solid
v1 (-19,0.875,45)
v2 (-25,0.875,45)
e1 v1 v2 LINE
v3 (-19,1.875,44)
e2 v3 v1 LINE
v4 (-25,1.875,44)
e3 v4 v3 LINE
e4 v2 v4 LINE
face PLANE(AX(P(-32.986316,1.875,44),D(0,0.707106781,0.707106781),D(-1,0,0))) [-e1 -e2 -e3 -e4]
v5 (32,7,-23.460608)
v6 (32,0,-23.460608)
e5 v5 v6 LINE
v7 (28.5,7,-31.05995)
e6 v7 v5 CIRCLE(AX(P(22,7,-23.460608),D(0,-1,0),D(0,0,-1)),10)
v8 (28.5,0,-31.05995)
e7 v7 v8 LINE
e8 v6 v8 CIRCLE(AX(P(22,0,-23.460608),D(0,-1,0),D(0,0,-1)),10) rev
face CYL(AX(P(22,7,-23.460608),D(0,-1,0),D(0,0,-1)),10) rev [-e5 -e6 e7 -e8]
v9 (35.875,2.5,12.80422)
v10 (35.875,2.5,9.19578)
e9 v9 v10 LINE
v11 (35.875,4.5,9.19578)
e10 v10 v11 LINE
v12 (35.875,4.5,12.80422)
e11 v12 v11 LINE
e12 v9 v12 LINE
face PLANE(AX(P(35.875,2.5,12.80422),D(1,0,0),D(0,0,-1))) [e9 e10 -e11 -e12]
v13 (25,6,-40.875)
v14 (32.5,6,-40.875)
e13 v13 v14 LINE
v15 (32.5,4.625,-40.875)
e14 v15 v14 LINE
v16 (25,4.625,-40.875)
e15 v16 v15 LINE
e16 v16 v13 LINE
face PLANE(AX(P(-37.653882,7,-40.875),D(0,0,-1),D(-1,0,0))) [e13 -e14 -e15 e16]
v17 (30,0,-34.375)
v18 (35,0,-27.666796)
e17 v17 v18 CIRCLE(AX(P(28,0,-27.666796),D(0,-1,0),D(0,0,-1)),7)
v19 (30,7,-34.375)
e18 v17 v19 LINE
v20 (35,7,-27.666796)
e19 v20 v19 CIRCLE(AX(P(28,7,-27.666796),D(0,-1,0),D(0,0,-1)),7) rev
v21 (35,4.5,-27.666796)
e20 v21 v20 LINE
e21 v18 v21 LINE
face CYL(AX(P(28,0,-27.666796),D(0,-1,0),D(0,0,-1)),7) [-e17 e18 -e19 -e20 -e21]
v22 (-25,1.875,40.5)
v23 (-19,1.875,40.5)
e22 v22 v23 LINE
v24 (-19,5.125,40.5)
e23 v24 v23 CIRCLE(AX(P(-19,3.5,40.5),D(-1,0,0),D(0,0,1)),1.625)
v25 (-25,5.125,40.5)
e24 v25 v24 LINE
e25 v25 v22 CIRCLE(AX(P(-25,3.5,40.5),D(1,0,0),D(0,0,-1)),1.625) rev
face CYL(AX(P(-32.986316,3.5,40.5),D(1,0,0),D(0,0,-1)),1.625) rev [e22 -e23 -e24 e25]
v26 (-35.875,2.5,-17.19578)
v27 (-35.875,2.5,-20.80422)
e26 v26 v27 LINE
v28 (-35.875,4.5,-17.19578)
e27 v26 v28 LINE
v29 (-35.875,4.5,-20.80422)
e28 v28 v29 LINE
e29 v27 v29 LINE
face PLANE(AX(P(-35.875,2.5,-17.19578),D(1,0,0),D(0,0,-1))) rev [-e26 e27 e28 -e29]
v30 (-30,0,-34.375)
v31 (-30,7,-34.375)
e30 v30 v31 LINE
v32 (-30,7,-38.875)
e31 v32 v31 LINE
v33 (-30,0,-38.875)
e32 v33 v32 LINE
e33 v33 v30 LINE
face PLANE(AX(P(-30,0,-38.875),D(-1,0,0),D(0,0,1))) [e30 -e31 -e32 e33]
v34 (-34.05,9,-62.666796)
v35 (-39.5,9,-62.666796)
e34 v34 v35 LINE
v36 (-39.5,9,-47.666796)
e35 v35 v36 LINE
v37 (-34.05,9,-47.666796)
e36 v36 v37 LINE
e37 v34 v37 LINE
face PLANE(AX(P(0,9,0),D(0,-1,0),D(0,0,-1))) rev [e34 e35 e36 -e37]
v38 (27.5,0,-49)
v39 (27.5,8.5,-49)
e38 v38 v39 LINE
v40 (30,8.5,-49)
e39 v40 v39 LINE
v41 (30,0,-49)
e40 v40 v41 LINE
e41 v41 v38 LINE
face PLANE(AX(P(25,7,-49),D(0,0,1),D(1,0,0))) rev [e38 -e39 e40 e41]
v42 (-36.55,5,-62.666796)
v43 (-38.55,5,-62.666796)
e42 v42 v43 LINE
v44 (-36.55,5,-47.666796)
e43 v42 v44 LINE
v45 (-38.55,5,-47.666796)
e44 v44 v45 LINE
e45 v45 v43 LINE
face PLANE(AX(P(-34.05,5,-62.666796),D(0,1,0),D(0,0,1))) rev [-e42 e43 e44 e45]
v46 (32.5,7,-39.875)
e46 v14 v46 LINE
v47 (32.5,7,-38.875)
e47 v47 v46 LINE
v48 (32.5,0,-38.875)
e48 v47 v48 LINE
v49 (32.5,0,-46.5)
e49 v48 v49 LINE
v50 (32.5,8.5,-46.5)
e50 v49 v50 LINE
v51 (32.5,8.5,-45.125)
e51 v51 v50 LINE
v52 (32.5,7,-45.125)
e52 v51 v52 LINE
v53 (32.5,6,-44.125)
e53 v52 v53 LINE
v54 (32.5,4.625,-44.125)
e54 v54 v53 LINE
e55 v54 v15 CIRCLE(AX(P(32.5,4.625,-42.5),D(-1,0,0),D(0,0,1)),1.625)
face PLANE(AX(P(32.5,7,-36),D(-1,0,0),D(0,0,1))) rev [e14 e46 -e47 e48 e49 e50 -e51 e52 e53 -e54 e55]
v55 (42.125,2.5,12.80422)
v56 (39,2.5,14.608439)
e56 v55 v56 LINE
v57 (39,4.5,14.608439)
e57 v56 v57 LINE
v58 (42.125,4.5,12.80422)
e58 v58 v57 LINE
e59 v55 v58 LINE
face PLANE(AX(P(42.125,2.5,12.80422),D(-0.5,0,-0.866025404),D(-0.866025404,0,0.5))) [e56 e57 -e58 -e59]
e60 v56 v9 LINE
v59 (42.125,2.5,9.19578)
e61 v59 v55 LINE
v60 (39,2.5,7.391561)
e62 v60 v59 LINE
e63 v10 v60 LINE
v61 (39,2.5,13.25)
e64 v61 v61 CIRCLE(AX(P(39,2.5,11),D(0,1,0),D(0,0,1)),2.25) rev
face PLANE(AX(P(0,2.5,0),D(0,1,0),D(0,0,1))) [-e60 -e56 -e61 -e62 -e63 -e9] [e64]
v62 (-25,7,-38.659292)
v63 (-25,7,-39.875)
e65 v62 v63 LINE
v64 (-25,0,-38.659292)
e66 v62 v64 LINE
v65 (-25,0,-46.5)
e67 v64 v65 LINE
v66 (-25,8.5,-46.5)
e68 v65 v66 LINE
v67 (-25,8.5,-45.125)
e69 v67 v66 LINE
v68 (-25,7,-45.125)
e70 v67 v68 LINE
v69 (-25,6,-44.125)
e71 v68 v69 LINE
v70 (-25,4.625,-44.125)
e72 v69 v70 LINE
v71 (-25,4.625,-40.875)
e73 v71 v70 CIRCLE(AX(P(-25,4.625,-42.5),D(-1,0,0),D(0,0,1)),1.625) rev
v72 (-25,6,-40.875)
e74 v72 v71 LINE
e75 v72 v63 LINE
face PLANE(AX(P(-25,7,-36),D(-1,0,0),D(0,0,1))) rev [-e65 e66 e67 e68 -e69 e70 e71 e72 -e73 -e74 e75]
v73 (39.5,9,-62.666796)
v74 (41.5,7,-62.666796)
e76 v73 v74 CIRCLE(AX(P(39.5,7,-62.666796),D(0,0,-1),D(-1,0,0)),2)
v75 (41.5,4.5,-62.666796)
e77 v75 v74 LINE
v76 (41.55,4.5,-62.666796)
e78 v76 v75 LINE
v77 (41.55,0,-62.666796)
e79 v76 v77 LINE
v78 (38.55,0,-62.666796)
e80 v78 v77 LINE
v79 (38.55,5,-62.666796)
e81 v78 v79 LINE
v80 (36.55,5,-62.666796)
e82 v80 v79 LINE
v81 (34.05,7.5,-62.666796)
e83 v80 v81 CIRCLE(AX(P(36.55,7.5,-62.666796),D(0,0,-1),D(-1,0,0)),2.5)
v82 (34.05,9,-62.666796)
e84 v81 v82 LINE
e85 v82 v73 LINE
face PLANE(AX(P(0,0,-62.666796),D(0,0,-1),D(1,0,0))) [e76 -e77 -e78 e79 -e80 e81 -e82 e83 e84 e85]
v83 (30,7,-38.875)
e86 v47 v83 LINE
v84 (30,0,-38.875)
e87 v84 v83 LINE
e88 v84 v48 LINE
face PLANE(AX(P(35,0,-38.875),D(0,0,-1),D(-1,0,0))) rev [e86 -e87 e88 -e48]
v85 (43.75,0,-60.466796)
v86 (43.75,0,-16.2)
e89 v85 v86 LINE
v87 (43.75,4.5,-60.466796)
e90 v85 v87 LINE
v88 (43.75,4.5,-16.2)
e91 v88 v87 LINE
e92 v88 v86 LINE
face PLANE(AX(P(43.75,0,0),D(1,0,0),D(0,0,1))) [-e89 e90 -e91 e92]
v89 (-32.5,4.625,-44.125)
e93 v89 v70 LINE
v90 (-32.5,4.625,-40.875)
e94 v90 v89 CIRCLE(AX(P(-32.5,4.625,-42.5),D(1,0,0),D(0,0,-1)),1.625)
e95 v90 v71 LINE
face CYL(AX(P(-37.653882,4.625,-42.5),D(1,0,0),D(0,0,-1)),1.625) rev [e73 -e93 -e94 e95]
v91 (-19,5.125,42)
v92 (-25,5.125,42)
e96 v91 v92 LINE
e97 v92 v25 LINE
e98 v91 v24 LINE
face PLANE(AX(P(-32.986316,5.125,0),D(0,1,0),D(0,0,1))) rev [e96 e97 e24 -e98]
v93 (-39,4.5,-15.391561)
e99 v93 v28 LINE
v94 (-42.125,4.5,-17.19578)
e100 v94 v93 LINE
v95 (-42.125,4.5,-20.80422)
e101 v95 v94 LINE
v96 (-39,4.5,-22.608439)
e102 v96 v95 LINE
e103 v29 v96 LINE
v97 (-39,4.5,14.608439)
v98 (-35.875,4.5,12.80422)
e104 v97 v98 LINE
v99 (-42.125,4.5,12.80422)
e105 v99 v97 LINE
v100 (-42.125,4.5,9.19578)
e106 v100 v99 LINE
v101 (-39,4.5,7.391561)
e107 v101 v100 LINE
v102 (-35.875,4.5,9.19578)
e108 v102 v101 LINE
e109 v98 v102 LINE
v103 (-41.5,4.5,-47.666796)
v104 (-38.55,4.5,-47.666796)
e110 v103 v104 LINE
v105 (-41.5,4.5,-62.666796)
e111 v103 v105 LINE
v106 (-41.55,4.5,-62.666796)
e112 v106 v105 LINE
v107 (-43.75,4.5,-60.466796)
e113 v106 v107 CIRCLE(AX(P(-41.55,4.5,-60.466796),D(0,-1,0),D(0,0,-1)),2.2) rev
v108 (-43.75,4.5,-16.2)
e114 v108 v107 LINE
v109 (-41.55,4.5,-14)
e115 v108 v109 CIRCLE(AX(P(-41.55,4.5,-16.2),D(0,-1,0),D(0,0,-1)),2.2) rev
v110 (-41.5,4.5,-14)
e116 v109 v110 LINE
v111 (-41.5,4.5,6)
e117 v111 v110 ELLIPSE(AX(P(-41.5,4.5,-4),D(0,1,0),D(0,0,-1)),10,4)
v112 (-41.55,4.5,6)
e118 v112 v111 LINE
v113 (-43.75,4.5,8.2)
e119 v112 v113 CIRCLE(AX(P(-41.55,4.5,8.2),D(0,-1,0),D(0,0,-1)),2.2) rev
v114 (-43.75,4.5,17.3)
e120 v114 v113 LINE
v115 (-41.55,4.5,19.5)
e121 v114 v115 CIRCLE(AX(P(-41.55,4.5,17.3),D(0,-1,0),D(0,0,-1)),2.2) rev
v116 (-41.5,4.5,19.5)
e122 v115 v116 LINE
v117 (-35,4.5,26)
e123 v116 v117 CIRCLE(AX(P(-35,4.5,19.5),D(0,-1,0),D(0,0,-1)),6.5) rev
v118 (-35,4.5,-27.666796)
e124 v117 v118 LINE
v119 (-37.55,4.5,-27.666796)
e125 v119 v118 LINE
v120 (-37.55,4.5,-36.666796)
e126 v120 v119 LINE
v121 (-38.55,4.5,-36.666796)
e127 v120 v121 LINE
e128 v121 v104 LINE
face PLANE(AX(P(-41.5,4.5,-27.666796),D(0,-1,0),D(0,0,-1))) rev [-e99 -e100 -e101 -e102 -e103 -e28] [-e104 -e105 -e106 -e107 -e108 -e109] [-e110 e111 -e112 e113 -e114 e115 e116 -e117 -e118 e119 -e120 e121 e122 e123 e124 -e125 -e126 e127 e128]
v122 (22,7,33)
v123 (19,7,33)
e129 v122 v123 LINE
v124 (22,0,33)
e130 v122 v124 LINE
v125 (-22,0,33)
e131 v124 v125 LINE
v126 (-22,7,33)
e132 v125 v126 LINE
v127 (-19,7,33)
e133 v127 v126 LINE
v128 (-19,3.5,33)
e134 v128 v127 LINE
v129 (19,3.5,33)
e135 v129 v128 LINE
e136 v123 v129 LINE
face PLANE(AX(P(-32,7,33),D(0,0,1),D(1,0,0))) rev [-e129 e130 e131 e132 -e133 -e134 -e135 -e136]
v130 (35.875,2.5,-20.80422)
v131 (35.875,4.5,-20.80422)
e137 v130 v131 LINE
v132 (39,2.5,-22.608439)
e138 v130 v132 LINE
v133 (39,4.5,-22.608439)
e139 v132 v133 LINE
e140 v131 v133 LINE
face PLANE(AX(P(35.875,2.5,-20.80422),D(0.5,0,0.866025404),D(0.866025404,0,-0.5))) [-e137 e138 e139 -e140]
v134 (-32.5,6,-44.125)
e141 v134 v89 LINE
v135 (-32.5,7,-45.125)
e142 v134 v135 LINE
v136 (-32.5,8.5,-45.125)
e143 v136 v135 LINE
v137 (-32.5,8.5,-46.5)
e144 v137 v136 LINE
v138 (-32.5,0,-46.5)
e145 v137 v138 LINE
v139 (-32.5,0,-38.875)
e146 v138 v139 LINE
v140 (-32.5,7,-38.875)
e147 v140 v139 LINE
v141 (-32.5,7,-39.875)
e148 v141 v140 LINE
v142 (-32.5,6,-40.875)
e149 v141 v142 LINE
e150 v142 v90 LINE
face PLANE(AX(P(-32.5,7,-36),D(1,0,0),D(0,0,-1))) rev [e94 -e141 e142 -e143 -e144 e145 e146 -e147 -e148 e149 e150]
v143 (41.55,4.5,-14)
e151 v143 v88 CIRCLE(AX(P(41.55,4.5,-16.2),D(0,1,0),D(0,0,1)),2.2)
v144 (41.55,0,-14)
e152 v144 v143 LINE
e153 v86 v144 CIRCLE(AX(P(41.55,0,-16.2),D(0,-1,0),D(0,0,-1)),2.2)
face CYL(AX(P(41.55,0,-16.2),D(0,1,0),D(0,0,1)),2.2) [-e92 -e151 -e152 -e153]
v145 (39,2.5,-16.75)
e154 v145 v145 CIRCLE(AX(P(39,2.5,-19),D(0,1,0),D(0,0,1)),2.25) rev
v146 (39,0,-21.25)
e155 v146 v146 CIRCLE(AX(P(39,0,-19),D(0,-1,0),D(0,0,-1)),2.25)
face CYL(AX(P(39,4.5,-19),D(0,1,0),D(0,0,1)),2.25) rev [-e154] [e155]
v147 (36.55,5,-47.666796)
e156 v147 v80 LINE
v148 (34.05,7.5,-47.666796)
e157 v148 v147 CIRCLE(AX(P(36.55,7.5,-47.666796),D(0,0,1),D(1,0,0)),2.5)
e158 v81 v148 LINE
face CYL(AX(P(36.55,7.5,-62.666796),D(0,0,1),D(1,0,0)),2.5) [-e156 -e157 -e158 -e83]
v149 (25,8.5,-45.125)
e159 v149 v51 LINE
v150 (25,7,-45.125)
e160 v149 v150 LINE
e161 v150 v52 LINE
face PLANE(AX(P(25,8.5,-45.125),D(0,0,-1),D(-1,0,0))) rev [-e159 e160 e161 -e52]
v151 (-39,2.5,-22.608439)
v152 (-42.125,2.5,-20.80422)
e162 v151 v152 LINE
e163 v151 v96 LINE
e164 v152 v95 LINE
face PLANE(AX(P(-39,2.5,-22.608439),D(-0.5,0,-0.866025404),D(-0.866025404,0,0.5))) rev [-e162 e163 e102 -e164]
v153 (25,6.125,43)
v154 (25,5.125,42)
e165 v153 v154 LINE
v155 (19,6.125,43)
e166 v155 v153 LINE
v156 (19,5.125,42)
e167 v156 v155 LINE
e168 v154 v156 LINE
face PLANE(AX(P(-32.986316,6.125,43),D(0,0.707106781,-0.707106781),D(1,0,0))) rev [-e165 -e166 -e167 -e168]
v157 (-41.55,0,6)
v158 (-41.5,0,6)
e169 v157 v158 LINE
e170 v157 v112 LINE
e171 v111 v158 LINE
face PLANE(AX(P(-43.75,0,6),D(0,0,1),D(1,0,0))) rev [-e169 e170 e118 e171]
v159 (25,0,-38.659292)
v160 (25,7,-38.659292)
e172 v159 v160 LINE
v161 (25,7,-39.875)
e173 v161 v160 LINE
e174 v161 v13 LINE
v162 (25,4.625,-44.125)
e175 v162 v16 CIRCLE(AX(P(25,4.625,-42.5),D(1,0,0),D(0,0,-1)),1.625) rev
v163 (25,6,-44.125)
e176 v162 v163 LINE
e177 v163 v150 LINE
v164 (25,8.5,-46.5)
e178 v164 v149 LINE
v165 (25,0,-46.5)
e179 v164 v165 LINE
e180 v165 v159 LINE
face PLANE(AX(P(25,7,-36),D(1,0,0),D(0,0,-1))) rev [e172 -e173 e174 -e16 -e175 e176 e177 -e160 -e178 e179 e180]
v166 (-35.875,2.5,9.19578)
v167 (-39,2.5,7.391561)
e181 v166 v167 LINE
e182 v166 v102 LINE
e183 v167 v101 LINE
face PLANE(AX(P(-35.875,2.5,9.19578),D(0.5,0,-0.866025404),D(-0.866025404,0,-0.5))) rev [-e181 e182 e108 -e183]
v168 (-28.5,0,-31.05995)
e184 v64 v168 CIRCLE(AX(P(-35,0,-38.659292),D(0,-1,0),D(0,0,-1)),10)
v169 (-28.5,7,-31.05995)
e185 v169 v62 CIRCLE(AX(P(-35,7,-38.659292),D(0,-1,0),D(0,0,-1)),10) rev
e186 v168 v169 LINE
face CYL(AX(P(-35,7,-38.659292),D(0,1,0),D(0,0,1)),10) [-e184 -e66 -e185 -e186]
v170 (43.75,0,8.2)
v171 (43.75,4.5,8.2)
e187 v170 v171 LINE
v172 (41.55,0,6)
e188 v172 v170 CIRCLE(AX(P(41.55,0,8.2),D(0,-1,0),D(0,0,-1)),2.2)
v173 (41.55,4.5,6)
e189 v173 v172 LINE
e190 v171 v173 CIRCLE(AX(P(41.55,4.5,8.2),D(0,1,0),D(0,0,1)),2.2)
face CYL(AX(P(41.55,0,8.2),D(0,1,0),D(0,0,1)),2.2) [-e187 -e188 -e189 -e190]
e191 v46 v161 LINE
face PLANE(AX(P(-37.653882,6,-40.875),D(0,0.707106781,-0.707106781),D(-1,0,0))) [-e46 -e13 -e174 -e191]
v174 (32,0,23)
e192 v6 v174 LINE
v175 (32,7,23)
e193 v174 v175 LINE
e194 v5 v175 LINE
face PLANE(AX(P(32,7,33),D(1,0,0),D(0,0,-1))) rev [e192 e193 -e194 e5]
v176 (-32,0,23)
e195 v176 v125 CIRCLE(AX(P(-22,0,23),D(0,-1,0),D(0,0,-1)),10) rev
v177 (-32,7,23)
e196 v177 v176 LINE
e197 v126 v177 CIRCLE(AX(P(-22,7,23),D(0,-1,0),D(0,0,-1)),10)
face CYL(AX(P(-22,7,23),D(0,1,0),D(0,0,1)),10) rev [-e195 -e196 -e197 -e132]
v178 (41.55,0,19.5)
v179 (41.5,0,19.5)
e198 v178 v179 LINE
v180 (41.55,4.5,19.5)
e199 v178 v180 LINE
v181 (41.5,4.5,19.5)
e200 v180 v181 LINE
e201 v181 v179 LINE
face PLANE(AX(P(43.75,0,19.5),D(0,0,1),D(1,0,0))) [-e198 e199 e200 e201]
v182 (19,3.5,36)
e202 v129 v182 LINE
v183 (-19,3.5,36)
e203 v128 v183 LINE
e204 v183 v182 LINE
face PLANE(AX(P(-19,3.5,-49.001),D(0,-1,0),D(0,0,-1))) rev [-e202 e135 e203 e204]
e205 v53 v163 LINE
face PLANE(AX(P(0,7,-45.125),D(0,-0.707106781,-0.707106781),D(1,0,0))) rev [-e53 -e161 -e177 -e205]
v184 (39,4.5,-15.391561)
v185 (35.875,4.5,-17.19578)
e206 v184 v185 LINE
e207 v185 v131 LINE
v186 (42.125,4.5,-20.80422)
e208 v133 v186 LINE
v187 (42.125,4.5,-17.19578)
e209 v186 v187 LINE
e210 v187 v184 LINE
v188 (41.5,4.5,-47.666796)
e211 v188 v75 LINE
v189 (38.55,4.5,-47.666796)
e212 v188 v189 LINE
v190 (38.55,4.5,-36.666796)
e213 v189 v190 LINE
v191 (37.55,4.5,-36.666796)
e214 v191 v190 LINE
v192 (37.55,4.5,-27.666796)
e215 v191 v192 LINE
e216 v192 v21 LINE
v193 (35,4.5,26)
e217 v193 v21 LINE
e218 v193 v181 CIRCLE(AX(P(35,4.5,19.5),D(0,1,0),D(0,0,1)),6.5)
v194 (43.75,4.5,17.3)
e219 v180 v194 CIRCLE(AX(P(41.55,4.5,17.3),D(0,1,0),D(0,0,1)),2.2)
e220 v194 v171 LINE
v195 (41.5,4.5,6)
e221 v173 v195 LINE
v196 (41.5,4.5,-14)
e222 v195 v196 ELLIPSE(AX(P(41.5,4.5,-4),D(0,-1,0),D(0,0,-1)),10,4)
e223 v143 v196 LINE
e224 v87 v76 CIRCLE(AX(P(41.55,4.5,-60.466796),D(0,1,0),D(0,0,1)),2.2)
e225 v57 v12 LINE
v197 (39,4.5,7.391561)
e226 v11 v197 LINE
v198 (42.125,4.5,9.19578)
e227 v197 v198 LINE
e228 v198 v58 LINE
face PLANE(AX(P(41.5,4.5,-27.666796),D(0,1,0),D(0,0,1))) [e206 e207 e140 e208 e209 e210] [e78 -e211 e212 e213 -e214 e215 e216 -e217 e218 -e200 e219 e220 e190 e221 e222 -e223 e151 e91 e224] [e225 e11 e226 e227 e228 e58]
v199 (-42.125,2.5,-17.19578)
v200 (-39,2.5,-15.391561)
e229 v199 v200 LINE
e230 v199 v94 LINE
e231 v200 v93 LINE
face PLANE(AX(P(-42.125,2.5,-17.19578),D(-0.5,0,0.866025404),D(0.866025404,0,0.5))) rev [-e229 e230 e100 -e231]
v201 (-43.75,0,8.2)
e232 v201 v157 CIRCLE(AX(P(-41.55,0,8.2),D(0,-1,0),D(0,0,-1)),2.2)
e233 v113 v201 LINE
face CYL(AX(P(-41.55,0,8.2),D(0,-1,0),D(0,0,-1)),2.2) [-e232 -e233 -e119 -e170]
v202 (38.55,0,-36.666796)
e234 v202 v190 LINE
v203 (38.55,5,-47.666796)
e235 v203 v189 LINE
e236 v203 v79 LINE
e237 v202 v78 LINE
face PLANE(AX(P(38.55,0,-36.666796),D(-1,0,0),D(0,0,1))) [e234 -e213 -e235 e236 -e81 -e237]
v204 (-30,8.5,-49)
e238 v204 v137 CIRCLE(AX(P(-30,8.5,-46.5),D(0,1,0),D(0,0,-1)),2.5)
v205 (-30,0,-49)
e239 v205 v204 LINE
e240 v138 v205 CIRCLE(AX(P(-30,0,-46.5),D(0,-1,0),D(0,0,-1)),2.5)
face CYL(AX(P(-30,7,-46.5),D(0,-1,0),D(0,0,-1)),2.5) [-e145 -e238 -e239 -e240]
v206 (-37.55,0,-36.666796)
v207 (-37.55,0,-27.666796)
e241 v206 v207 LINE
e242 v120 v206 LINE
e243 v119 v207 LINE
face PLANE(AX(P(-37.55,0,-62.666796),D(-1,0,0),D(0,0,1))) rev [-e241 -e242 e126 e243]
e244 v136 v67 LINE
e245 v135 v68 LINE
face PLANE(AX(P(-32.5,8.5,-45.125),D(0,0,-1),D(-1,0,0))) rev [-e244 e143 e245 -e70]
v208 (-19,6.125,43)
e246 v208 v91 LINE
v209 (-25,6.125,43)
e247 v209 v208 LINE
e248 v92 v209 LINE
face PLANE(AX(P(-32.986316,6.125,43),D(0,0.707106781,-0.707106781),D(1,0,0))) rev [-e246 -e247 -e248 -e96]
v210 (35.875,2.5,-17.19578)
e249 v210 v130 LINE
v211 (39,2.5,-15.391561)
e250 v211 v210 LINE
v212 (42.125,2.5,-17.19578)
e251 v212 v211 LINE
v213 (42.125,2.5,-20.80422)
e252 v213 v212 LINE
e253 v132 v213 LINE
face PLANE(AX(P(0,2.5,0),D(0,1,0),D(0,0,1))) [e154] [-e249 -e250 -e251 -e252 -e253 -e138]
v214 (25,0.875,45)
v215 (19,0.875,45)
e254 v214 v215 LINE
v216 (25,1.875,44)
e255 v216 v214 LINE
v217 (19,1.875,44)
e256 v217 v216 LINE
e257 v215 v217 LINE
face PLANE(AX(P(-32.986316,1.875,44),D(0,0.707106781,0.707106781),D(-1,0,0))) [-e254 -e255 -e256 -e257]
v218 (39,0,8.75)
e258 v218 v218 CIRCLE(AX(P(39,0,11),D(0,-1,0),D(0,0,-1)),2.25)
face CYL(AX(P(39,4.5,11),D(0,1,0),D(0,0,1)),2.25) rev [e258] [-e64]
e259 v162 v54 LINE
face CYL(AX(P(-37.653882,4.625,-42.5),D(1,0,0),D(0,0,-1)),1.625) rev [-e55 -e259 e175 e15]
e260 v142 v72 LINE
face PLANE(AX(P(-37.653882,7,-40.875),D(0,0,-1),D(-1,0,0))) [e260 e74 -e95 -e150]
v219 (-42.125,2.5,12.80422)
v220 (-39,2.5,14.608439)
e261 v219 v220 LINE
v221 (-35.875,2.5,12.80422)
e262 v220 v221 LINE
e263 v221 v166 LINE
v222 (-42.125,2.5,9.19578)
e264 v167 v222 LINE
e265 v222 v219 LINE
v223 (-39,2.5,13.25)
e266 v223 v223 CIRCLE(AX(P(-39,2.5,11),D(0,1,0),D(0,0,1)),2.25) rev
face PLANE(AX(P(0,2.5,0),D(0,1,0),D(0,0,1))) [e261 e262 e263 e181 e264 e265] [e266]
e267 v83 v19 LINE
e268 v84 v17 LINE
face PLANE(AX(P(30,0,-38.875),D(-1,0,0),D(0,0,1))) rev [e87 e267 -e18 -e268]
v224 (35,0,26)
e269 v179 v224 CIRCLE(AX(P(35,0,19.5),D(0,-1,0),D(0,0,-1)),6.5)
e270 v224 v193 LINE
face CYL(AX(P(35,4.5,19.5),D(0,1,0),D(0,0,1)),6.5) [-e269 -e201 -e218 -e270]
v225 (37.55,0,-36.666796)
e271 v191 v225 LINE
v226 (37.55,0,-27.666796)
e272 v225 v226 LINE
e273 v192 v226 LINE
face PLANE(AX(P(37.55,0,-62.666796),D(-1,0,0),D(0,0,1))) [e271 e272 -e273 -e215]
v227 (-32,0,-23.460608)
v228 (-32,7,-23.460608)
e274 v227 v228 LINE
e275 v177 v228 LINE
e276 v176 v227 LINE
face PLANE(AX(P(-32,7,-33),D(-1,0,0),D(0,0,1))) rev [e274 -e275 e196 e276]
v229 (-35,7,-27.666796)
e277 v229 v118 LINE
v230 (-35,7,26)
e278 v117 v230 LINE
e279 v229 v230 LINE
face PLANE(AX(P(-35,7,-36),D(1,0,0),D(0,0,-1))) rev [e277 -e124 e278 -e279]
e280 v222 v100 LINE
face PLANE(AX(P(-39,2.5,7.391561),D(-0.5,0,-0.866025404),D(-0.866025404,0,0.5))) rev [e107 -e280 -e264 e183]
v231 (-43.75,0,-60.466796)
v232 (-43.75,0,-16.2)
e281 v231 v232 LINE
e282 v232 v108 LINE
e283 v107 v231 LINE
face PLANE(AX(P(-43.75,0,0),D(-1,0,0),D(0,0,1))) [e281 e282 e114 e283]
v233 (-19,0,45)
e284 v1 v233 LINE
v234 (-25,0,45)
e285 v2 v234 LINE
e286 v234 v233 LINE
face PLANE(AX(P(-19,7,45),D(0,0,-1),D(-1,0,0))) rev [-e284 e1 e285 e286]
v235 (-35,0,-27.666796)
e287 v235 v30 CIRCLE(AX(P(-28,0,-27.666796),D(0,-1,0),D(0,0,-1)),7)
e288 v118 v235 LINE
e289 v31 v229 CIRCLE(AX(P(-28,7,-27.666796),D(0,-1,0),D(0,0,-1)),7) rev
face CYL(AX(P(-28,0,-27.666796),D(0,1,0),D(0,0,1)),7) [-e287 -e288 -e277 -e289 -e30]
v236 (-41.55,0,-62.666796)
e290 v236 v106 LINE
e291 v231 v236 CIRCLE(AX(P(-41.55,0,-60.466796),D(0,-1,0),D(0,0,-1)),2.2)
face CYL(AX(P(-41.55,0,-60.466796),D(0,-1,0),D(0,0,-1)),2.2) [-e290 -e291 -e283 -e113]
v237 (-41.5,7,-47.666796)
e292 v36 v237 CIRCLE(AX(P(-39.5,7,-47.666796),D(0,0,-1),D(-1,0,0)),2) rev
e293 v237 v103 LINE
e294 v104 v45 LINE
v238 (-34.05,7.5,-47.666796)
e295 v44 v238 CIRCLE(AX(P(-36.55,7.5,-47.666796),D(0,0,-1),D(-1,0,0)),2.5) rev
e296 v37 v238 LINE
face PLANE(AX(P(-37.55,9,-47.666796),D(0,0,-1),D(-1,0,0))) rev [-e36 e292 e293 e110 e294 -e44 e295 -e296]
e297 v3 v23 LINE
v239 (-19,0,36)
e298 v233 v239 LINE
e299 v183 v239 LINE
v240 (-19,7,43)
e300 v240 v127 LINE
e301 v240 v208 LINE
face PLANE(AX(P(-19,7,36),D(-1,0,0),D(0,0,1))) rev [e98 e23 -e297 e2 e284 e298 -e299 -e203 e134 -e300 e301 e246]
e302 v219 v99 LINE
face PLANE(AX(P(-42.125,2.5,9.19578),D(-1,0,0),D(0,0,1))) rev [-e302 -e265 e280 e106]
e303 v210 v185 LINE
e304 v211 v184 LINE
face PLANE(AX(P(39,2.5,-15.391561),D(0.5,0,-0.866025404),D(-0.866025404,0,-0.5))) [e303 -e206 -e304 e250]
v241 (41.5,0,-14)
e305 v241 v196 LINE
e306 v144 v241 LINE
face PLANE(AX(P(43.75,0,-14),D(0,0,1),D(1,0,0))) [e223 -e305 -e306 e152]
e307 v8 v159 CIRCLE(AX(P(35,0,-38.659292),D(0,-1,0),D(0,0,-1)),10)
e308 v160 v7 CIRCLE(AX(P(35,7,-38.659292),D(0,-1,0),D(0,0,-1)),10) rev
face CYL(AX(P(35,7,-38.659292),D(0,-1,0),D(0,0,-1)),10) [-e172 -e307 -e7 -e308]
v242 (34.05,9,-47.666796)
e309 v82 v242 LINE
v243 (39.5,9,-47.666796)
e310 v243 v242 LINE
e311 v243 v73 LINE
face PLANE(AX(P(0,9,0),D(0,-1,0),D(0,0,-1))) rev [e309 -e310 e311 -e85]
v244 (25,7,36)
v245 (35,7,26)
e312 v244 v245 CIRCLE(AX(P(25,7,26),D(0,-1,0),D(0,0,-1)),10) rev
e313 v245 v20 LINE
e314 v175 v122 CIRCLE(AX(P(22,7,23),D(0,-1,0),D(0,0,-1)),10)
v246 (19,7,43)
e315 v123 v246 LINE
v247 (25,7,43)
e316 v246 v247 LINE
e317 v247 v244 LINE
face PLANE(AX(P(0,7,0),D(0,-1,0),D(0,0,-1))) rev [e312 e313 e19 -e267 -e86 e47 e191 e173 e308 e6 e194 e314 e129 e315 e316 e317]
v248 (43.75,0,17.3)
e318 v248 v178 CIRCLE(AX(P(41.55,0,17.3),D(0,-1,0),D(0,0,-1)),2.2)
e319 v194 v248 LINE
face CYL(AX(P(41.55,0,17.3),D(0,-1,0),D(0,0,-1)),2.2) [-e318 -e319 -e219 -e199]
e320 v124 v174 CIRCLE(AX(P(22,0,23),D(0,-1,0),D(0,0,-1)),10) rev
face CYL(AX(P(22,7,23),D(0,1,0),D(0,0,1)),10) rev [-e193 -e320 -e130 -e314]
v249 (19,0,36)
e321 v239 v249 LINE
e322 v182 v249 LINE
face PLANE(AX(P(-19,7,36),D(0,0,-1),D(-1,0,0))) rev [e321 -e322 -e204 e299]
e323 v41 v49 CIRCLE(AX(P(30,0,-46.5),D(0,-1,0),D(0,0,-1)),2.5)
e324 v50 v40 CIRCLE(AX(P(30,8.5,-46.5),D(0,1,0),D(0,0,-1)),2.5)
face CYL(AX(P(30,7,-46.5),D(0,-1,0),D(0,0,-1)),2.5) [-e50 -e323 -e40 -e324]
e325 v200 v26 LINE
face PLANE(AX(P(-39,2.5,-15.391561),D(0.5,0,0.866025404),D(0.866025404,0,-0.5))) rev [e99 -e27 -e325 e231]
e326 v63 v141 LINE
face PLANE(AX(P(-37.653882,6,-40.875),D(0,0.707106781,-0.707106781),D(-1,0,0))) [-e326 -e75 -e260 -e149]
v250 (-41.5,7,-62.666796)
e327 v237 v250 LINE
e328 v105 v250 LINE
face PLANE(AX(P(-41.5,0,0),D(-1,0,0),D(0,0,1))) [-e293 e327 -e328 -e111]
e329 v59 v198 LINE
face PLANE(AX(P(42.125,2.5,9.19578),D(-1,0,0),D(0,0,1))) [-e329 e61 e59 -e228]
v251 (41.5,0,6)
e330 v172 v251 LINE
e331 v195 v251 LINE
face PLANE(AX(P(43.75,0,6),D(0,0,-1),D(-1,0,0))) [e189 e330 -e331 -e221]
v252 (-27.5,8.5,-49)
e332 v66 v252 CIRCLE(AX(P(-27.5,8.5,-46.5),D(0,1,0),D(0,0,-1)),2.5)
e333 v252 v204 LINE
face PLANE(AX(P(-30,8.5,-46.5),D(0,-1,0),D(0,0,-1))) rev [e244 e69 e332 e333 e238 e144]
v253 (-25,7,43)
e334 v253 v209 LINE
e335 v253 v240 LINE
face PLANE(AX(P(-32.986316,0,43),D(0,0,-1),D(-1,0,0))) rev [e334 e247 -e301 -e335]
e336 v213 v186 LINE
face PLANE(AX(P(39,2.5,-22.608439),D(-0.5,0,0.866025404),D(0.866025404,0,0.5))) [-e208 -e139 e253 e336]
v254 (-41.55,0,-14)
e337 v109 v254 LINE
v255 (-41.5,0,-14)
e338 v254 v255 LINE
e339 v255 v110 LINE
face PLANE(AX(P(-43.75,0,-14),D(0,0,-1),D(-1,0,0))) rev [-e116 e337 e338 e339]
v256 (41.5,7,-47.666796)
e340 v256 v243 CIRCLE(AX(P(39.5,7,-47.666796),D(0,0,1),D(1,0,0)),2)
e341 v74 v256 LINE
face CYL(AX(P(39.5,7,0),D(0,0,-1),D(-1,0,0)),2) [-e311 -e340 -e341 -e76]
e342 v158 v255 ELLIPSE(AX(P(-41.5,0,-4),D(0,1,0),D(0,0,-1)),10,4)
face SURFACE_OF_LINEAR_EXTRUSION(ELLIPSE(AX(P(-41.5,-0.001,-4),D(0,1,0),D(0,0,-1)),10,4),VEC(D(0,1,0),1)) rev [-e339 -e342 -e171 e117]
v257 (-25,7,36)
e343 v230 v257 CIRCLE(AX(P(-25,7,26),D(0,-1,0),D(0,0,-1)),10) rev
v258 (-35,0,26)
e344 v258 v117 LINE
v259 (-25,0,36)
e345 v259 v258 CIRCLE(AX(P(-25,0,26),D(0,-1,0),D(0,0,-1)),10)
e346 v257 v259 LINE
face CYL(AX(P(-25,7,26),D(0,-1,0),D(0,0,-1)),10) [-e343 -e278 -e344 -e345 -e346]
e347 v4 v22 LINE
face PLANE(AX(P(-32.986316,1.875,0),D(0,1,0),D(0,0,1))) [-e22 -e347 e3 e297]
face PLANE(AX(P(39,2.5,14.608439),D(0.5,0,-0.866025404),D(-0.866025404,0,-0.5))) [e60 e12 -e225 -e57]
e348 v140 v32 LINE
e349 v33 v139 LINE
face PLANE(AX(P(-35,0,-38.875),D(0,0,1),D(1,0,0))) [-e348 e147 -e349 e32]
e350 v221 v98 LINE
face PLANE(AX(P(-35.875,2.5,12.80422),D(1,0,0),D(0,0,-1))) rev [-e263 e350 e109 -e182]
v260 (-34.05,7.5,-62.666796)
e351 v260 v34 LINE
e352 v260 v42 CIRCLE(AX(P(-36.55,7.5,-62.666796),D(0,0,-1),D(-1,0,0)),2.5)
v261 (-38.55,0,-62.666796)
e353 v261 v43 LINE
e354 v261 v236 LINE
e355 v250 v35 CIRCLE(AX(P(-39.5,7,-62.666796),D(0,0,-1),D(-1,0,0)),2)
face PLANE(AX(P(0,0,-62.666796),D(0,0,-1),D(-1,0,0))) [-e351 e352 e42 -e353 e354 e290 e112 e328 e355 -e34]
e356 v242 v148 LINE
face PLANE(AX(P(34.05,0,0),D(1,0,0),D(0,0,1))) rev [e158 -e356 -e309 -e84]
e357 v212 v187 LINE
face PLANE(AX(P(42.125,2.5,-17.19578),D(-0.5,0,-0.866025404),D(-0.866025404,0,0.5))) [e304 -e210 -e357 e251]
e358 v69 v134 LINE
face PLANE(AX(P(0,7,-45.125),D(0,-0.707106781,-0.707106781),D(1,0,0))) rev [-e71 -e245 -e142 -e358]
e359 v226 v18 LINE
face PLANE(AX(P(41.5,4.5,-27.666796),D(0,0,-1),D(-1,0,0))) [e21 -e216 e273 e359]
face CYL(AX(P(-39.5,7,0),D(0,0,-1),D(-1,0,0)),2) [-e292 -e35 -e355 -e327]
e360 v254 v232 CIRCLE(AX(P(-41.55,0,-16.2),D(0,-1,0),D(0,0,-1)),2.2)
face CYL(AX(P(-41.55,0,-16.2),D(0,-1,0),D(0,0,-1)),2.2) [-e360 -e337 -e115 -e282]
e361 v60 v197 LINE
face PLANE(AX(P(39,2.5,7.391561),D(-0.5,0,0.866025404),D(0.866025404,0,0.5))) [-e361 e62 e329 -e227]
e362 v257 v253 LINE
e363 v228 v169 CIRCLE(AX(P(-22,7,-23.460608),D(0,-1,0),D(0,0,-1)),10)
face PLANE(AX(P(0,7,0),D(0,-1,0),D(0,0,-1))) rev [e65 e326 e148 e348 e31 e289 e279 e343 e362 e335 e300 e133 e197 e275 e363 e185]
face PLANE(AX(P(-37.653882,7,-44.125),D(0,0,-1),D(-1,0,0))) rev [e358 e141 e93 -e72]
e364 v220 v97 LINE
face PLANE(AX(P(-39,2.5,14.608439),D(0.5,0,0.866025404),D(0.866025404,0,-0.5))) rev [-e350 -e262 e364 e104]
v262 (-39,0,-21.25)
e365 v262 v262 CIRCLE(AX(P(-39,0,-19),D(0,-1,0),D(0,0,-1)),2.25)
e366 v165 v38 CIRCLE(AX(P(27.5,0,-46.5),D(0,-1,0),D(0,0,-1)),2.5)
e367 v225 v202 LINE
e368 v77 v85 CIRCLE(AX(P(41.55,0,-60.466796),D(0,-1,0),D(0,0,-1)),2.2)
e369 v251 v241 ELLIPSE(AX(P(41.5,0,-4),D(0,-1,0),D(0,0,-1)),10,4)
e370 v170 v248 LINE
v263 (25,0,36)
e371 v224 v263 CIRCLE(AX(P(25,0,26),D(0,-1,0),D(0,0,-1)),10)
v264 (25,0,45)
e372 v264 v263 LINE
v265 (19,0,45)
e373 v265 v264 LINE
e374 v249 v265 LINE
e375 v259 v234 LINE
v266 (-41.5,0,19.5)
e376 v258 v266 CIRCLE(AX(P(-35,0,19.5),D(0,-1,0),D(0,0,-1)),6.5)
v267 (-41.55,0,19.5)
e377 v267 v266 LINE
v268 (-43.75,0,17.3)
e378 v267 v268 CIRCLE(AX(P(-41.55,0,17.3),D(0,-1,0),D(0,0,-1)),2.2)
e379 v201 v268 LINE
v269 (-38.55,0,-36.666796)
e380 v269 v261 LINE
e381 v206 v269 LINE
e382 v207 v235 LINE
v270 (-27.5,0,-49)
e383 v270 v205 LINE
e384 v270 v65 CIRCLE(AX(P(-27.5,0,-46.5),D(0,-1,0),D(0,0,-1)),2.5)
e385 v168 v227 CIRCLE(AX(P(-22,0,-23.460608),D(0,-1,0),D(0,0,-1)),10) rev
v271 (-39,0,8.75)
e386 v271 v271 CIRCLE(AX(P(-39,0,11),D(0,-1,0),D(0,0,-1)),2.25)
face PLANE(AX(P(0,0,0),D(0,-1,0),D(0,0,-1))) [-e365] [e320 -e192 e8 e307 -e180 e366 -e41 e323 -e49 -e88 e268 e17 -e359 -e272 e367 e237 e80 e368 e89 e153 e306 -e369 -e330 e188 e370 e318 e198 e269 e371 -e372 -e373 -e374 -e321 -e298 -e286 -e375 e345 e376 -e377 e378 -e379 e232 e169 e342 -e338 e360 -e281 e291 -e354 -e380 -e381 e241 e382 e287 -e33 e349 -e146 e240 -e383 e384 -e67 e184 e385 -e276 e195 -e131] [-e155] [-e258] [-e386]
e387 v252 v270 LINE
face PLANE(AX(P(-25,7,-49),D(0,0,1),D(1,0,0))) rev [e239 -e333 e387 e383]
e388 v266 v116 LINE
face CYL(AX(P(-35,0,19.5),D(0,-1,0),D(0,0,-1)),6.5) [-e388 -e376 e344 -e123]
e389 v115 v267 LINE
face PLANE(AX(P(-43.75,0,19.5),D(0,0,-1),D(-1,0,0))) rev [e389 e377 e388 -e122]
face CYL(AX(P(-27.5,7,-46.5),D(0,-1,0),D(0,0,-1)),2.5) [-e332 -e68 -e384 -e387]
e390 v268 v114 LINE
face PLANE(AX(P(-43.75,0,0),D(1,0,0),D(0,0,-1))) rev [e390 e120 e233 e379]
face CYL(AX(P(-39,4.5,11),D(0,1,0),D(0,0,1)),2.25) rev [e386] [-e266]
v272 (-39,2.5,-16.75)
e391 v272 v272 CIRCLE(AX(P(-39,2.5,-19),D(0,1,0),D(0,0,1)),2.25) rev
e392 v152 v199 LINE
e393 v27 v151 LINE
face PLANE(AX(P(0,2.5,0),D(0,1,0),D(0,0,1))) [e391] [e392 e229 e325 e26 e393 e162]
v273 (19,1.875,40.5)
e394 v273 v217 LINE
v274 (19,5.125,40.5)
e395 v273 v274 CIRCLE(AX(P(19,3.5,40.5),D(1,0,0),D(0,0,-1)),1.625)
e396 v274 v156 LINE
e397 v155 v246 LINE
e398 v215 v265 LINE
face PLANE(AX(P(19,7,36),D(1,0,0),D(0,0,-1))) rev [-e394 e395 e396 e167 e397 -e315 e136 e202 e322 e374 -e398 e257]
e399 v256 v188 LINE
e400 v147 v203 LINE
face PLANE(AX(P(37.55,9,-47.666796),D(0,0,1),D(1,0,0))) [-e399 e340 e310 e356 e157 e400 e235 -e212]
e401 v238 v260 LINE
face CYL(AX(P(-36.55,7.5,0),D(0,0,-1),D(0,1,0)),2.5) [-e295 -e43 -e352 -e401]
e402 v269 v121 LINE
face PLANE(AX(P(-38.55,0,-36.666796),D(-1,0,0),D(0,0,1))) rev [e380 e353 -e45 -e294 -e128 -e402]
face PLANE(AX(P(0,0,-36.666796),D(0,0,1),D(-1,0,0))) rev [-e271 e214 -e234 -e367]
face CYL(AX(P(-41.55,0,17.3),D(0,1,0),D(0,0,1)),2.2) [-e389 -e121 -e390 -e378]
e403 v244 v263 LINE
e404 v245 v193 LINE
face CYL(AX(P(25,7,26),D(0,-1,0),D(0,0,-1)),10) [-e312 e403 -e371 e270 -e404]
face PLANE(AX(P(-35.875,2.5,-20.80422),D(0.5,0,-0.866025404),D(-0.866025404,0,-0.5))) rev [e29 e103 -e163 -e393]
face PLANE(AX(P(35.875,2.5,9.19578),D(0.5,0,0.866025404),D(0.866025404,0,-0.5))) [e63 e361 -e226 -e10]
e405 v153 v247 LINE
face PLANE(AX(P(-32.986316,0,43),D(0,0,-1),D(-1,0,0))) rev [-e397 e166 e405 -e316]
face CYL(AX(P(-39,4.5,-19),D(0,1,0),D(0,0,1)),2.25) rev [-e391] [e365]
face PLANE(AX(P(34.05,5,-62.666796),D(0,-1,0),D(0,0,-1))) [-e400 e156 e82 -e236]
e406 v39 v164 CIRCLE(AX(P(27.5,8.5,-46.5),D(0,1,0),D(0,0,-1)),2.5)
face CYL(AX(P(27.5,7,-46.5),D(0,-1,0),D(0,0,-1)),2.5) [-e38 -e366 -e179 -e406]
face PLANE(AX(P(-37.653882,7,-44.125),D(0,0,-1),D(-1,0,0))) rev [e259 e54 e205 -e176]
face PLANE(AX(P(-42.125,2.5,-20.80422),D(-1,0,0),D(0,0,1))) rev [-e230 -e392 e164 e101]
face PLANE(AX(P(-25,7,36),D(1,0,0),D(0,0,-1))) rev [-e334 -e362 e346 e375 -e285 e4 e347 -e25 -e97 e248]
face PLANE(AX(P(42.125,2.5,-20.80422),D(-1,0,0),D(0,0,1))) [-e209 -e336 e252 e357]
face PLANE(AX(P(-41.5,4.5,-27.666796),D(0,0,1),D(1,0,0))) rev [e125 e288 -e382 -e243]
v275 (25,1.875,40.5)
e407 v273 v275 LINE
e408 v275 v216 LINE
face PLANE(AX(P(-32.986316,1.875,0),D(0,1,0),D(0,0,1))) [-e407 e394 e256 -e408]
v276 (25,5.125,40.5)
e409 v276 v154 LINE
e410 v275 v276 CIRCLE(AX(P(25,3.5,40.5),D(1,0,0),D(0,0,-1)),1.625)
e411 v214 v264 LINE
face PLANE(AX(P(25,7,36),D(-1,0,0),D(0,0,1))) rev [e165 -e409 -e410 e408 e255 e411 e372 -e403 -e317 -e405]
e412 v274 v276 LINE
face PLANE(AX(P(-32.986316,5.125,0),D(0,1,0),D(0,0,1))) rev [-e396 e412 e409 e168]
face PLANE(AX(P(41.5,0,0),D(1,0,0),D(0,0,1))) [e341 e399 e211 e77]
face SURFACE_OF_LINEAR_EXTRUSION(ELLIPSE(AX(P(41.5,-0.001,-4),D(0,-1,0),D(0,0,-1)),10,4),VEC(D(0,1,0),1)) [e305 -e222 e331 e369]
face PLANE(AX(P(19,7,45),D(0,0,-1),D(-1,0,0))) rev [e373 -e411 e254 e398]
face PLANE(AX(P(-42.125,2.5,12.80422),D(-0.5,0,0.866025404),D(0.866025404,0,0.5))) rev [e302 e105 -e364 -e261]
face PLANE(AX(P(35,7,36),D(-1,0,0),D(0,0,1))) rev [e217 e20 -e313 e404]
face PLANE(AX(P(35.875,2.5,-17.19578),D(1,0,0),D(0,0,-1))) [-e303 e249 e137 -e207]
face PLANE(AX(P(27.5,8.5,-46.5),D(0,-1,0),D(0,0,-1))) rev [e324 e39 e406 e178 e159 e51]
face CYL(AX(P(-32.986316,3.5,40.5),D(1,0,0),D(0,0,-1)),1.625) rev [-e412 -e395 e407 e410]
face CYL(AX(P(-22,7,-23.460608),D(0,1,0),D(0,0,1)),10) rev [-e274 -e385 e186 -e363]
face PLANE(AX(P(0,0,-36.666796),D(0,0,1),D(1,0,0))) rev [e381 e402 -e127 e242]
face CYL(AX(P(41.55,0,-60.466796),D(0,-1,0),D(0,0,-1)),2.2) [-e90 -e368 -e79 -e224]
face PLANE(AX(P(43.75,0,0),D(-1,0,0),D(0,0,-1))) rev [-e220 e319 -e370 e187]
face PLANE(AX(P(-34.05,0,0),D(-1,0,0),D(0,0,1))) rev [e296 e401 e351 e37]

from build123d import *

# Parameters (mm, degrees)
BOSS_EXTRUDE1_DEPTH            = 7
CUT_EXTRUDE2_REACH             = 79.782
SKETCH2_W                      = 2
SKETCH2_H                      = 1.875
CUT_EXTRUDE5_DEPTH             = 65
CUT_EXTRUDE8_START             = -7
SKETCH9_W                      = 5
SKETCH9_H                      = 4.5
CUT_EXTRUDE8_DEPTH             = 7
FILLET1_R                      = 7
FILLET3_R                      = 10
FILLET5_R                      = 10
FILLET6_R                      = 10
FILLET7_R                      = 10
FILLET8_R                      = 2.5
CHAMFER2_SIZE                  = 1
CUT_EXTRUDE7_REACH             = 94.19
SKETCH20_W                     = 38
SKETCH20_H                     = 3.5
SKETCH22_W                     = 53.666796068
SKETCH22_H                     = 4.5
BOSS_EXTRUDE9_DEPTH            = 6.5
SKETCH24_W                     = 3.95
SKETCH24_H                     = 4.5
BOSS_EXTRUDE11_DEPTH           = 35
SKETCH25_W                     = 3.95
SKETCH25_H                     = 15
BOSS_EXTRUDE12_DEPTH           = 4.5
SKETCH28_W                     = 15
SKETCH28_H                     = 4
BOSS_EXTRUDE13_DEPTH           = 3.5
FILLET16_R                     = 2
FILLET17_R                     = 2.5
M4_CLEARANCE_HOLE1_D           = 4.5
M4_CLEARANCE_HOLE1_CSINK_D     = 4.55
M4_CLEARANCE_HOLE1_CSINK_ANGLE = 90
CUT_EXTRUDE9_REACH             = 77.297
SKETCH33_RX                    = 10
SKETCH33_RY                    = 4
SKETCH35_W                     = 1
SKETCH35_H                     = 5
CUT_EXTRUDE11_DEPTH            = 26
FILLET16_OF_MIRROR9_R          = 2
FILLET17_OF_MIRROR9_R          = 2.5
FILLET23_R                     = 6.5
SKETCH36_W                     = 48.666796068
SKETCH36_H                     = 4.5
SKETCH36_W_2                   = 13.5
BOSS_EXTRUDE14_DEPTH           = 2.25
FILLET24_R                     = 2.2
CUT_EXTRUDE12_DEPTH            = 2
FILLET24_OF_MIRROR10_R         = 2.2
BOSS_EXTRUDE15_START           = 1.5
BOSS_EXTRUDE15_DEPTH           = 1.5
CHAMFER4_SIZE                  = 1


# Some blends are built 0.0001 mm under size
with BuildPart() as part:
    # Sketch1 → Boss-Extrude1 (new body)
    with BuildSketch(Plane(origin=(0, 0, 0), x_dir=(1, 0, 0), z_dir=(0, 1, 0))):
        Polygon((-19, -45), (-19, -36), (19, -36), (19, -45), (25, -45), (25, -36), (35, -36), (35, 36), (32.5, 36), (32.5, 49), (25, 49), (25, 36), (25, 33), (32, 33), (32, -33), (-32, -33), (-32, 33), (-25, 33), (-25, 36), (-25, 49), (-32.5, 49), (-32.5, 36), (-35, 36), (-35, -36), (-25, -36), (-25, -45), align=None)
    extrude(amount=BOSS_EXTRUDE1_DEPTH)

    # Sketch2 → Cut-Extrude2 (cut, up to next)
    with BuildSketch(Plane(origin=(25, 0, 0), x_dir=(0, 0, -1), z_dir=(1, 0, 0)), mode=Mode.PRIVATE) as cut_extrude2_sk1:
        with Locations((-44, 6.0625)):
            Rectangle(SKETCH2_W, SKETCH2_H)
    cut_extrude2_tool1 = extrude(cut_extrude2_sk1.sketch, amount=-CUT_EXTRUDE2_REACH, mode=Mode.PRIVATE) & part.part
    # Sketch2 → Cut-Extrude2 (cut, up to next)
    with BuildSketch(Plane(origin=(25, 0, 0), x_dir=(0, 0, -1), z_dir=(1, 0, 0)), mode=Mode.PRIVATE) as cut_extrude2_sk2:
        with BuildLine():
            Line((-43, 5.125), (-45, 5.125))
            Line((-45, 5.125), (-45, 1.875))
            Line((-45, 1.875), (-40.5, 1.875))
            ThreePointArc((-40.5, 1.875), (-38.875, 3.5), (-40.5, 5.125))
            Line((-40.5, 5.125), (-43, 5.125))
        make_face()
    cut_extrude2_tool2 = extrude(cut_extrude2_sk2.sketch, amount=-CUT_EXTRUDE2_REACH, mode=Mode.PRIVATE) & part.part
    add(cut_extrude2_tool1.solids().sort_by_distance((25, 6.0625, 44))[0], mode=Mode.SUBTRACT)
    add(cut_extrude2_tool1.solids().sort_by_distance((25, 6.0625, 44))[1], mode=Mode.SUBTRACT)
    add(cut_extrude2_tool2.solids().sort_by_distance((25, 3.5, 42.100477))[0], mode=Mode.SUBTRACT)
    add(cut_extrude2_tool2.solids().sort_by_distance((25, 3.5, 42.100477))[1], mode=Mode.SUBTRACT)

    # Sketch3 → Cut-Extrude5 (cut)
    with BuildSketch(Plane(origin=(32.5, 0, 0), x_dir=(0, 0, -1), z_dir=(1, 0, 0))):
        with BuildLine():
            Line((44.125, 4.625), (44.125, 7))
            Line((44.125, 7), (40.875, 7))
            Line((40.875, 7), (40.875, 4.625))
            ThreePointArc((40.875, 4.625), (42.5, 3), (44.125, 4.625))
        make_face()
    extrude(amount=-CUT_EXTRUDE5_DEPTH, mode=Mode.SUBTRACT)

    # Sketch9 → Cut-Extrude8 (cut)
    with BuildSketch(Plane(origin=(0, 7, 0), x_dir=(1, 0, 0), z_dir=(0, 1, 0)).offset(CUT_EXTRUDE8_START)):
        with Locations((32.5, 36.625)):
            Rectangle(SKETCH9_W, SKETCH9_H)
    cut_extrude8 = extrude(amount=CUT_EXTRUDE8_DEPTH, mode=Mode.SUBTRACT)

    # Mirror1: Cut-Extrude8 across plane
    add(cut_extrude8.mirror(Plane.ZY), mode=Mode.SUBTRACT)

    # Fillet1
    # the kernel refuses this fillet: 7 mm, written as the material it takes off along each edge
    with BuildSketch(Plane(origin=(35, -16.770509831, -34.375), x_dir=(-1, 0, 0), z_dir=(0, 1, 0))) as fillet1_piece_1:
        with BuildLine():
            CenterArc((7, 6.708203932), FILLET1_R, 180, 73.398450401)
            Line((0, 6.708203932), (-0.14, 6.708203932))
            Line((-0.14, 6.708203932), (-0.14, 0))
            Line((-0.14, 0), (0, -0.14))
            ThreePointArc((0, -0.14), (2.5, -0.14), (4.96, -0.134164079))
            Line((4.96, -0.134164079), (5, 0))
        make_face()
    extrude(amount=40.541019662, mode=Mode.SUBTRACT)
    with BuildSketch(Plane(origin=(-35, -16.770509831, -34.375), x_dir=(0, 0, 1), z_dir=(0, 1, 0))) as fillet1_piece_2:
        with BuildLine():
            CenterArc((6.708203932, 7), FILLET1_R, 196.601549599, 73.398450401)
            Line((0, 5), (-0.134164079, 4.96))
            ThreePointArc((-0.134164079, 4.96), (-0.14, 2.5), (-0.14, 0))
            Line((-0.14, 0), (0, -0.14))
            Line((0, -0.14), (6.708203932, -0.14))
            Line((6.708203932, -0.14), (6.708203932, 0))
        make_face()
    extrude(amount=40.541019662, mode=Mode.SUBTRACT)

    # Fillet3
    # the kernel refuses this fillet: 10 mm, written as the material it adds along each edge
    with BuildSketch(Plane(origin=(32, 0, -33), x_dir=(0, 0, 1), z_dir=(0, 1, 0))) as fillet3_piece_1:
        with BuildLine():
            CenterArc((9.539392014, -10), FILLET3_R, 90, 72.542396876)
            Line((0, -7), (-0.19078784, -6.94))
            ThreePointArc((-0.19078784, -6.94), (-0.2, -3.5), (-0.2, 0))
            Line((-0.2, 0), (0, 0.2))
            Line((0, 0.2), (9.539392014, 0.2))
            Line((9.539392014, 0.2), (9.539392014, 0))
        make_face()
    extrude(amount=7)
    with BuildSketch(Plane(origin=(-32, 0, -33), x_dir=(1, 0, 0), z_dir=(0, 1, 0))) as fillet3_piece_2:
        with BuildLine():
            CenterArc((10, -9.539392014), FILLET3_R, 107.457603124, 72.542396876)
            Line((0, -9.539392014), (-0.2, -9.539392014))
            Line((-0.2, -9.539392014), (-0.2, 0))
            Line((-0.2, 0), (0, 0.2))
            ThreePointArc((0, 0.2), (3.5, 0.2), (6.94, 0.19078784))
            Line((6.94, 0.19078784), (7, 0))
        make_face()
    extrude(amount=7)

    # Fillet5
    fillet5_edges = [part.edges().sort_by_distance(p)[0] for p in [
        (35, 3.5, 36),
        (-35, 3.5, 36),
    ]]
    fillet(fillet5_edges, radius=FILLET5_R - 0.0001)  # a hair under: the kernel refuses the full size

    # Fillet6
    fillet6_edges = [part.edges().sort_by_distance(p)[0] for p in [
        (-32, 3.5, 33),
        (32, 3.5, 33),
    ]]
    fillet(fillet6_edges, radius=FILLET6_R)

    # Fillet7
    fillet7_edges = [part.edges().sort_by_distance(p)[0] for p in [
        (-25, 3.5, -33),
        (25, 3.5, -33),
    ]]
    fillet(fillet7_edges, radius=FILLET7_R)

    # Fillet8
    fillet8_edges = [part.edges().sort_by_distance(p)[0] for p in [
        (-32.5, 3.5, -49),
        (-25, 3.5, -49),
        (25, 3.5, -49),
        (32.5, 3.5, -49),
    ]]
    fillet(fillet8_edges, radius=FILLET8_R)

    # Chamfer2
    chamfer2_edges = [part.edges().sort_by_distance(p)[0] for p in [
        (28.75, 7, -40.875),
        (28.75, 7, -44.125),
        (-28.75, 7, -40.875),
        (-28.75, 7, -44.125),
    ]]
    chamfer(chamfer2_edges, length=CHAMFER2_SIZE)

    # Sketch20 → Cut-Extrude7 (cut, up to next)
    with BuildSketch(Plane.XY.offset(36), mode=Mode.PRIVATE) as cut_extrude7_sk1:
        with Locations((0, 5.25)):
            Rectangle(SKETCH20_W, SKETCH20_H)
    cut_extrude7_tool1 = extrude(cut_extrude7_sk1.sketch, amount=-CUT_EXTRUDE7_REACH, mode=Mode.PRIVATE) & part.part
    add(cut_extrude7_tool1.solids().sort_by_distance((0, 5.25, 36))[0], mode=Mode.SUBTRACT)

    # Sketch22 → Boss-Extrude9 (add)
    with BuildSketch(Plane.ZY.offset(35)):
        with Locations((-0.833398034, 2.25)):
            Rectangle(SKETCH22_W, SKETCH22_H)
    boss_extrude9 = extrude(amount=BOSS_EXTRUDE9_DEPTH)

    # Sketch24 → Boss-Extrude11 (add)
    with BuildSketch(Plane(origin=(0, 0, -27.666796068), x_dir=(-1, 0, 0), z_dir=(0, 0, -1))):
        with Locations((39.525, 2.25)):
            Rectangle(SKETCH24_W, SKETCH24_H)
    boss_extrude11 = extrude(amount=BOSS_EXTRUDE11_DEPTH)

    # Sketch25 → Boss-Extrude12 (add)
    with BuildSketch(Plane(origin=(0, 4.5, 0), x_dir=(1, 0, 0), z_dir=(0, 1, 0))):
        with Locations((-39.525, 55.166796068)):
            Rectangle(SKETCH25_W, SKETCH25_H)
    boss_extrude12 = extrude(amount=BOSS_EXTRUDE12_DEPTH)

    # Sketch28 → Boss-Extrude13 (add)
    with BuildSketch(Plane(origin=(-37.55, 0, 0), x_dir=(0, 0, -1), z_dir=(1, 0, 0))):
        with Locations((55.166796068, 7)):
            Rectangle(SKETCH28_W, SKETCH28_H)
    boss_extrude13 = extrude(amount=BOSS_EXTRUDE13_DEPTH)

    # Fillet16
    fillet16_edges = [part.edges().sort_by_distance(p)[0] for p in [
        (-41.5, 9, -55.166796068),
    ]]
    fillet(fillet16_edges, radius=FILLET16_R)

    # Fillet17
    fillet17_edges = [part.edges().sort_by_distance(p)[0] for p in [
        (-34.05, 5, -55.166796068),
    ]]
    fillet(fillet17_edges, radius=FILLET17_R)

    # M4 Clearance Hole1 (through all)
    with Locations(Plane(origin=(0, 4.5, 0), x_dir=(1, 0, 0), z_dir=(0, 1, 0))):
        with Locations((-39, -11), (-39, 19)):
            m4_clearance_hole1 = CounterSinkHole(M4_CLEARANCE_HOLE1_D / 2, M4_CLEARANCE_HOLE1_CSINK_D / 2, counter_sink_angle=M4_CLEARANCE_HOLE1_CSINK_ANGLE)

    # Sketch33 → Cut-Extrude9 (cut, up to next)
    with BuildSketch(Plane(origin=(0, 4.5, 0), x_dir=(1, 0, 0), z_dir=(0, 1, 0)), mode=Mode.PRIVATE) as cut_extrude9_sk1:
        with Locations(Location((-41.5, 4), (0, 0, 90))):
            Ellipse(SKETCH33_RX, SKETCH33_RY)
    cut_extrude9_tool1 = extrude(cut_extrude9_sk1.sketch, amount=-CUT_EXTRUDE9_REACH, mode=Mode.PRIVATE) & part.part
    cut_extrude9 = cut_extrude9_tool1.solids().sort_by_distance((-41.5, 4.5, -4))[0]
    add(cut_extrude9, mode=Mode.SUBTRACT)

    # Sketch35 → Cut-Extrude11 (cut)
    with BuildSketch(Plane(origin=(0, 0, -62.666796068), x_dir=(-1, 0, 0), z_dir=(0, 0, -1))):
        with Locations((38.05, 2.5)):
            Rectangle(SKETCH35_W, SKETCH35_H)
    cut_extrude11 = extrude(amount=-CUT_EXTRUDE11_DEPTH, mode=Mode.SUBTRACT)

    # Mirror9: Boss-Extrude9, Boss-Extrude11, Boss-Extrude12, Boss-Extrude13, M4 Clearance Hole1, Cut-Extrude9, Cut-Extrude11 across plane
    add(boss_extrude9.mirror(Plane.ZY))
    add(boss_extrude11.mirror(Plane.ZY))
    add(boss_extrude12.mirror(Plane.ZY))
    add(boss_extrude13.mirror(Plane.ZY))
    add(m4_clearance_hole1.mirror(Plane.ZY), mode=Mode.SUBTRACT)
    add(cut_extrude9.mirror(Plane.ZY), mode=Mode.SUBTRACT)
    add(cut_extrude11.mirror(Plane.ZY), mode=Mode.SUBTRACT)

    # Fillet16 of Mirror9
    fillet16_of_mirror9_edges = [part.edges().sort_by_distance(p)[0] for p in [
        (41.5, 9, -55.166796068),
    ]]
    fillet(fillet16_of_mirror9_edges, radius=FILLET16_OF_MIRROR9_R)

    # Fillet17 of Mirror9
    fillet17_of_mirror9_edges = [part.edges().sort_by_distance(p)[0] for p in [
        (34.05, 5, -55.166796068),
    ]]
    fillet(fillet17_of_mirror9_edges, radius=FILLET17_OF_MIRROR9_R)

    # Fillet23
    fillet23_edges = [part.edges().sort_by_distance(p)[0] for p in [
        (-41.5, 2.25, 26),
        (41.5, 2.25, 26),
    ]]
    fillet(fillet23_edges, radius=FILLET23_R - 0.0001)  # a hair under: the kernel refuses the full size

    # Sketch36 → Boss-Extrude14 (add)
    with BuildSketch(Plane.ZY.offset(41.5)):
        with Locations((-38.333398034, 2.25)):
            Rectangle(SKETCH36_W, SKETCH36_H)
        with Locations((12.75, 2.25)):
            Rectangle(SKETCH36_W_2, SKETCH36_H)
    boss_extrude14 = extrude(amount=BOSS_EXTRUDE14_DEPTH)

    # Fillet24
    fillet24_edges = [part.edges().sort_by_distance(p)[0] for p in [
        (-43.75, 2.25, -14),
        (-43.75, 2.25, -62.666796068),
        (-43.75, 2.25, 6),
        (-43.75, 2.25, 19.5),
    ]]
    fillet(fillet24_edges, radius=FILLET24_R)

    # Sketch37 → Cut-Extrude12 (cut)
    with BuildSketch(Plane(origin=(0, 4.5, 0), x_dir=(1, 0, 0), z_dir=(0, 1, 0))):
        Polygon((-39, 22.608439182), (-42.125, 20.804219591), (-42.125, 17.195780409), (-39, 15.391560818), (-35.875, 17.195780409), (-35.875, 20.804219591), align=None)
        Polygon((-39, -7.391560818), (-42.125, -9.195780409), (-42.125, -12.804219591), (-39, -14.608439182), (-35.875, -12.804219591), (-35.875, -9.195780409), align=None)
    cut_extrude12 = extrude(amount=-CUT_EXTRUDE12_DEPTH, mode=Mode.SUBTRACT)

    # Mirror10: Boss-Extrude14, Cut-Extrude12 across plane
    add(boss_extrude14.mirror(Plane.ZY))
    add(cut_extrude12.mirror(Plane.ZY), mode=Mode.SUBTRACT)

    # Fillet24 of Mirror10
    fillet24_of_mirror10_edges = [part.edges().sort_by_distance(p)[0] for p in [
        (43.75, 2.25, -14),
        (43.75, 2.25, -62.666796068),
        (43.75, 2.25, 6),
        (43.75, 2.25, 19.5),
    ]]
    fillet(fillet24_of_mirror10_edges, radius=FILLET24_OF_MIRROR10_R)

    # Sketch38 → Boss-Extrude15 (add)
    with BuildSketch(Plane(origin=(0, 7, 0), x_dir=(1, 0, 0), z_dir=(0, 1, 0)).offset(BOSS_EXTRUDE15_START)):
        with BuildLine():
            Line((-32.5, 45.125), (-25, 45.125))
            Line((-25, 45.125), (-25, 46.5))
            ThreePointArc((-25, 46.5), (-25.732233047, 48.267766953), (-27.5, 49))
            Line((-27.5, 49), (-30, 49))
            ThreePointArc((-30, 49), (-31.767766953, 48.267766953), (-32.5, 46.5))
            Line((-32.5, 46.5), (-32.5, 45.125))
        make_face()
        with BuildLine():
            Line((25, 45.125), (32.5, 45.125))
            Line((32.5, 45.125), (32.5, 46.5))
            ThreePointArc((32.5, 46.5), (31.767766953, 48.267766953), (30, 49))
            Line((30, 49), (27.5, 49))
            ThreePointArc((27.5, 49), (25.732233047, 48.267766953), (25, 46.5))
            Line((25, 46.5), (25, 45.125))
        make_face()
    extrude(amount=-BOSS_EXTRUDE15_DEPTH)

    # Chamfer4
    chamfer4_edges = [part.edges().sort_by_distance(p)[0] for p in [
        (-22, 5.125, 43),
        (22, 5.125, 43),
        (-22, 1.875, 45),
        (22, 1.875, 45),
    ]]
    chamfer(chamfer4_edges, length=CHAMFER4_SIZE)


solid = part.part
